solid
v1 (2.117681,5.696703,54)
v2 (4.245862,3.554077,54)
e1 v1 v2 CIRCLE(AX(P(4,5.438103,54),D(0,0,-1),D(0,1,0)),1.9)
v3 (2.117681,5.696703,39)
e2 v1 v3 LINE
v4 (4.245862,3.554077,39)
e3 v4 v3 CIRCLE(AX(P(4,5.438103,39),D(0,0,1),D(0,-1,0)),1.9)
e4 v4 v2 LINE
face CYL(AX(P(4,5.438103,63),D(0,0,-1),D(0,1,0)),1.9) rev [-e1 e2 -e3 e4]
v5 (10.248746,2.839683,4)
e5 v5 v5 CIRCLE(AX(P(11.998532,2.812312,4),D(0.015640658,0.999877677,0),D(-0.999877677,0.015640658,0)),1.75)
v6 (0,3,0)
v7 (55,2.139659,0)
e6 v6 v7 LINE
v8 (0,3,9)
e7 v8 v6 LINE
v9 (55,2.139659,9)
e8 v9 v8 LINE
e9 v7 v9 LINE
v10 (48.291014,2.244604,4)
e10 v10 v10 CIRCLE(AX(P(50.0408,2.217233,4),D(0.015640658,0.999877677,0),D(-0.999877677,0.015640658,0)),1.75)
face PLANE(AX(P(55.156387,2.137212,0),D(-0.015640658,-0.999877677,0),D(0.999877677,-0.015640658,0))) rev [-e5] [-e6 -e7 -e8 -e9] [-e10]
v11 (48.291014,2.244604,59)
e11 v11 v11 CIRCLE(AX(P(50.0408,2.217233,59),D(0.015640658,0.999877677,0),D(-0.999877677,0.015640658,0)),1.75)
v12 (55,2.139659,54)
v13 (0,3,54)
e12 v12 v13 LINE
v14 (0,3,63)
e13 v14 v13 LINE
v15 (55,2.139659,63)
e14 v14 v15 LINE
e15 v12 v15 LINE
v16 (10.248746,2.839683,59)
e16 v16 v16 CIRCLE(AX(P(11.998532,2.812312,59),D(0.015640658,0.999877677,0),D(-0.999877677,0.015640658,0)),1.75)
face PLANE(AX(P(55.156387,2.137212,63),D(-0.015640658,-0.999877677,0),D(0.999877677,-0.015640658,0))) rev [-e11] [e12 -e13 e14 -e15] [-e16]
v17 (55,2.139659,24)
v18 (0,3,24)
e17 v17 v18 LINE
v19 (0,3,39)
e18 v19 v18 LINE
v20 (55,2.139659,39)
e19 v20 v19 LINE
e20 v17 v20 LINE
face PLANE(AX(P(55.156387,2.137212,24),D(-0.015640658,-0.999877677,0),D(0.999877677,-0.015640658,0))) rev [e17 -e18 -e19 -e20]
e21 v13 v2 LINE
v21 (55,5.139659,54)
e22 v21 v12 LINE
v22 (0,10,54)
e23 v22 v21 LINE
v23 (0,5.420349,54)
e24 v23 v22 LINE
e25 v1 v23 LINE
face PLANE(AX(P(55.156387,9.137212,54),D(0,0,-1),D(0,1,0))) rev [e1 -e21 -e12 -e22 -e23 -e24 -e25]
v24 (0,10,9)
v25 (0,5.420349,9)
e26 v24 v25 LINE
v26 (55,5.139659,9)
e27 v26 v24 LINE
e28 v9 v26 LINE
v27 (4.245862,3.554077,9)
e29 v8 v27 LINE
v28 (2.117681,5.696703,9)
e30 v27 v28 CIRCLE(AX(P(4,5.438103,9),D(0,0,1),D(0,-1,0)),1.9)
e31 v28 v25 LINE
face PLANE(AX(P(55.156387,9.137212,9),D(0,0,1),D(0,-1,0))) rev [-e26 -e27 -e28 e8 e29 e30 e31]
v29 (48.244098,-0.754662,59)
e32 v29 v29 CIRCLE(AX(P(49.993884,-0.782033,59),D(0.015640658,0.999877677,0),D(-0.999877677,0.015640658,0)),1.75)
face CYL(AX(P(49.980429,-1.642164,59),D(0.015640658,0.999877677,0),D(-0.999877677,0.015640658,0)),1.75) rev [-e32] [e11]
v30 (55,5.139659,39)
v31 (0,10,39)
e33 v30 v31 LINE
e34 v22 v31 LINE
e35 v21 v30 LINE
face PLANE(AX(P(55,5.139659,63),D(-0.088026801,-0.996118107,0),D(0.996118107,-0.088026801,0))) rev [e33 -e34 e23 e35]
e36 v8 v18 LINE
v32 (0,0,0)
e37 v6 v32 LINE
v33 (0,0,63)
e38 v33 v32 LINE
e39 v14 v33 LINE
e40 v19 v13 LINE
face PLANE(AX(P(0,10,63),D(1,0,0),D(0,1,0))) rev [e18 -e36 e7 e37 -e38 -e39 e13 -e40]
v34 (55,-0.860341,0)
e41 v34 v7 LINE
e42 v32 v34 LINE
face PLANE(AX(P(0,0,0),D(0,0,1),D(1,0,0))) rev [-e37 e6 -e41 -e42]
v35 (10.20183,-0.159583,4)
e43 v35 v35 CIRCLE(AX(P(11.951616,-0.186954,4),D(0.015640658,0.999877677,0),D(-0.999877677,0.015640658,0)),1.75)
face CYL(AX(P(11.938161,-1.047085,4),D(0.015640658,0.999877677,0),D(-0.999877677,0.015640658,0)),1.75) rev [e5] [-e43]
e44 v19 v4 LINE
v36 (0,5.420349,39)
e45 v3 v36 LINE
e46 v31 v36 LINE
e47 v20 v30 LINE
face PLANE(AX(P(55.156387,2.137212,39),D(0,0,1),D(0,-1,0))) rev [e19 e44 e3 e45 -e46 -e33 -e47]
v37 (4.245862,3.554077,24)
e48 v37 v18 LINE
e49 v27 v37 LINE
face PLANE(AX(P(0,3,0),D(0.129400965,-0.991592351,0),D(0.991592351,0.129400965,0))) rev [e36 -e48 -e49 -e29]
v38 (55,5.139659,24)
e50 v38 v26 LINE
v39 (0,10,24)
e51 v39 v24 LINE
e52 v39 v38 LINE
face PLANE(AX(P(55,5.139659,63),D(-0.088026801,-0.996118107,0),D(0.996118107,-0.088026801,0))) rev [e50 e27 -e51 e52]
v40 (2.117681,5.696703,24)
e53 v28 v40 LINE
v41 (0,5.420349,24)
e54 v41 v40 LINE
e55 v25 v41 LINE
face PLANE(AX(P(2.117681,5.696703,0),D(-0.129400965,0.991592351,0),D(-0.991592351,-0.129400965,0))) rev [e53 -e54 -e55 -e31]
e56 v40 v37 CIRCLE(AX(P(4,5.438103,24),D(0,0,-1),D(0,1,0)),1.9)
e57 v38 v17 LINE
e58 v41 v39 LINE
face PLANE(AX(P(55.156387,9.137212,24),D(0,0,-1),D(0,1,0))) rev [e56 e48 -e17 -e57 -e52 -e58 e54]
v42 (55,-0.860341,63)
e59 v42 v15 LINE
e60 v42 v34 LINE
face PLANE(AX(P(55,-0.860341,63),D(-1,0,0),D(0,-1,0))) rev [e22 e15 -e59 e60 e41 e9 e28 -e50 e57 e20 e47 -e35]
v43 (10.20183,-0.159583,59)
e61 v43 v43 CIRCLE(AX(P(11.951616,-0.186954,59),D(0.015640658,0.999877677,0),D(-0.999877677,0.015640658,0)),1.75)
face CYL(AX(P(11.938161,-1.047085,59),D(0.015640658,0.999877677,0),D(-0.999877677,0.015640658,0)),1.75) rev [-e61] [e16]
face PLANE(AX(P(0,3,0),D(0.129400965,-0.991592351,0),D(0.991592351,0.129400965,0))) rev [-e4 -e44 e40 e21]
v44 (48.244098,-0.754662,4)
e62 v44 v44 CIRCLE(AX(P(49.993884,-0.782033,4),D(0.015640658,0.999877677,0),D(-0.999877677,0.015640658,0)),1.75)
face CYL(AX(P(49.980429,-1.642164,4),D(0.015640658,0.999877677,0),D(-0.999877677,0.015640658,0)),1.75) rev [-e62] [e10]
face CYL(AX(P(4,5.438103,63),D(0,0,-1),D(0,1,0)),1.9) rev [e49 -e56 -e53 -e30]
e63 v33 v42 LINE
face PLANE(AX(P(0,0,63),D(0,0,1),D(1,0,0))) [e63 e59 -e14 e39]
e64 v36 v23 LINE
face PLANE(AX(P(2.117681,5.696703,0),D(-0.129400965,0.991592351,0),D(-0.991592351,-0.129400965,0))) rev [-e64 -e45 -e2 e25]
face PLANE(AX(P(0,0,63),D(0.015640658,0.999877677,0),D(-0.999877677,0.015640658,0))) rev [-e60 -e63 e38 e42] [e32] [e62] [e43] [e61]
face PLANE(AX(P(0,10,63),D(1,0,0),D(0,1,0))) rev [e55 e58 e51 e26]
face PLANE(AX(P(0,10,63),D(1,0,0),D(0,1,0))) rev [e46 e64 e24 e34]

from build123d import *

# Parameters (mm, degrees)
BOSS_EXTRUDE1_DEPTH     = 63
CUT_EXTRUDE1_START      = 24
CUT_EXTRUDE1_DEPTH      = 15
CUT_EXTRUDE1_2_DEPTH    = 9
CUT_EXTRUDE1_START_2    = 54
CUT_EXTRUDE1_3_DEPTH    = 9
CUT_EXTRUDE2_DEPTH      = 78.723870207
CUT_EXTRUDE2_DEPTH_BACK = 78.723870207
SKETCH3_R               = 1.9
SKETCH4_R               = 1.75
CUT_EXTRUDE3_DEPTH      = 84.891904797
CUT_EXTRUDE4_DEPTH      = 78.723870207


# Read off the part's stored shape, not the designer's step: Cut-Extrude1
with BuildPart() as part:
    # Sketch1 → Boss-Extrude1 (new body)
    with BuildSketch(Plane.XY):
        Polygon((0, 0), (55, -0.860341408), (55, 5.139658592), (0, 10), align=None)
    extrude(amount=BOSS_EXTRUDE1_DEPTH)

    # Cut-Extrude1 outline → Cut-Extrude1 (cut)
    with BuildSketch(Plane.XY.offset(CUT_EXTRUDE1_START)):
        Polygon((0, 10), (0, 3), (55, 2.139658592), (55, 5.139658592), align=None)
    extrude(amount=CUT_EXTRUDE1_DEPTH, mode=Mode.SUBTRACT)

    # Cut-Extrude1 2 outline → Cut-Extrude1 2 (cut)
    with BuildSketch(Plane.XY):
        Polygon((0, 10), (0, 3), (55, 2.139658592), (55, 5.139658592), align=None)
    extrude(amount=CUT_EXTRUDE1_2_DEPTH, mode=Mode.SUBTRACT)

    # Cut-Extrude1 3 outline → Cut-Extrude1 3 (cut)
    with BuildSketch(Plane.XY.offset(CUT_EXTRUDE1_START_2)):
        Polygon((0, 10), (0, 3), (55, 2.139658592), (55, 5.139658592), align=None)
    extrude(amount=CUT_EXTRUDE1_3_DEPTH, mode=Mode.SUBTRACT)

    # Sketch3 → Cut-Extrude2 (cut, two sides: drawn at the far end of the back side and taken through both)
    with BuildSketch(Plane(origin=(0, 0, 9), x_dir=(-1, 0, 0), z_dir=(0, 0, -1)).offset(-CUT_EXTRUDE2_DEPTH_BACK)):
        with Locations(Location((-4, 5.438102572, 0), (0, 0, 90))):
            Circle(SKETCH3_R)
    extrude(amount=CUT_EXTRUDE2_DEPTH + CUT_EXTRUDE2_DEPTH_BACK, mode=Mode.SUBTRACT)

    # Sketch4 → Cut-Extrude3 (cut, through all)
    with BuildSketch(Plane(origin=(0.046916233, 2.999266109, 0), x_dir=(0.9998776774332501, -0.01564065761691552, 0), z_dir=(0.01564065761691552, 0.9998776774332501, 0))):
        with Locations(Location((11.953078027, -59, 0), (0, 0, 180))):
            Circle(SKETCH4_R)
        with Locations(Location((50, -59, 0), (0, 0, 180))):
            Circle(SKETCH4_R)
        with Locations(Location((50, -4, 0), (0, 0, 180))):
            Circle(SKETCH4_R)
        with Locations(Location((11.953078027, -4, 0), (0, 0, 180))):
            Circle(SKETCH4_R)
    extrude(amount=-CUT_EXTRUDE3_DEPTH, mode=Mode.SUBTRACT)

    # Sketch6 → Cut-Extrude4 (cut, through all)
    with BuildSketch(Plane.XY.offset(54)):
        Polygon((2.117680715, 5.69670286), (0, 5.420349449), (0, 3), (4.245861834, 3.554077106), align=None)
    extrude(amount=-CUT_EXTRUDE4_DEPTH, mode=Mode.SUBTRACT)


solid = part.part
